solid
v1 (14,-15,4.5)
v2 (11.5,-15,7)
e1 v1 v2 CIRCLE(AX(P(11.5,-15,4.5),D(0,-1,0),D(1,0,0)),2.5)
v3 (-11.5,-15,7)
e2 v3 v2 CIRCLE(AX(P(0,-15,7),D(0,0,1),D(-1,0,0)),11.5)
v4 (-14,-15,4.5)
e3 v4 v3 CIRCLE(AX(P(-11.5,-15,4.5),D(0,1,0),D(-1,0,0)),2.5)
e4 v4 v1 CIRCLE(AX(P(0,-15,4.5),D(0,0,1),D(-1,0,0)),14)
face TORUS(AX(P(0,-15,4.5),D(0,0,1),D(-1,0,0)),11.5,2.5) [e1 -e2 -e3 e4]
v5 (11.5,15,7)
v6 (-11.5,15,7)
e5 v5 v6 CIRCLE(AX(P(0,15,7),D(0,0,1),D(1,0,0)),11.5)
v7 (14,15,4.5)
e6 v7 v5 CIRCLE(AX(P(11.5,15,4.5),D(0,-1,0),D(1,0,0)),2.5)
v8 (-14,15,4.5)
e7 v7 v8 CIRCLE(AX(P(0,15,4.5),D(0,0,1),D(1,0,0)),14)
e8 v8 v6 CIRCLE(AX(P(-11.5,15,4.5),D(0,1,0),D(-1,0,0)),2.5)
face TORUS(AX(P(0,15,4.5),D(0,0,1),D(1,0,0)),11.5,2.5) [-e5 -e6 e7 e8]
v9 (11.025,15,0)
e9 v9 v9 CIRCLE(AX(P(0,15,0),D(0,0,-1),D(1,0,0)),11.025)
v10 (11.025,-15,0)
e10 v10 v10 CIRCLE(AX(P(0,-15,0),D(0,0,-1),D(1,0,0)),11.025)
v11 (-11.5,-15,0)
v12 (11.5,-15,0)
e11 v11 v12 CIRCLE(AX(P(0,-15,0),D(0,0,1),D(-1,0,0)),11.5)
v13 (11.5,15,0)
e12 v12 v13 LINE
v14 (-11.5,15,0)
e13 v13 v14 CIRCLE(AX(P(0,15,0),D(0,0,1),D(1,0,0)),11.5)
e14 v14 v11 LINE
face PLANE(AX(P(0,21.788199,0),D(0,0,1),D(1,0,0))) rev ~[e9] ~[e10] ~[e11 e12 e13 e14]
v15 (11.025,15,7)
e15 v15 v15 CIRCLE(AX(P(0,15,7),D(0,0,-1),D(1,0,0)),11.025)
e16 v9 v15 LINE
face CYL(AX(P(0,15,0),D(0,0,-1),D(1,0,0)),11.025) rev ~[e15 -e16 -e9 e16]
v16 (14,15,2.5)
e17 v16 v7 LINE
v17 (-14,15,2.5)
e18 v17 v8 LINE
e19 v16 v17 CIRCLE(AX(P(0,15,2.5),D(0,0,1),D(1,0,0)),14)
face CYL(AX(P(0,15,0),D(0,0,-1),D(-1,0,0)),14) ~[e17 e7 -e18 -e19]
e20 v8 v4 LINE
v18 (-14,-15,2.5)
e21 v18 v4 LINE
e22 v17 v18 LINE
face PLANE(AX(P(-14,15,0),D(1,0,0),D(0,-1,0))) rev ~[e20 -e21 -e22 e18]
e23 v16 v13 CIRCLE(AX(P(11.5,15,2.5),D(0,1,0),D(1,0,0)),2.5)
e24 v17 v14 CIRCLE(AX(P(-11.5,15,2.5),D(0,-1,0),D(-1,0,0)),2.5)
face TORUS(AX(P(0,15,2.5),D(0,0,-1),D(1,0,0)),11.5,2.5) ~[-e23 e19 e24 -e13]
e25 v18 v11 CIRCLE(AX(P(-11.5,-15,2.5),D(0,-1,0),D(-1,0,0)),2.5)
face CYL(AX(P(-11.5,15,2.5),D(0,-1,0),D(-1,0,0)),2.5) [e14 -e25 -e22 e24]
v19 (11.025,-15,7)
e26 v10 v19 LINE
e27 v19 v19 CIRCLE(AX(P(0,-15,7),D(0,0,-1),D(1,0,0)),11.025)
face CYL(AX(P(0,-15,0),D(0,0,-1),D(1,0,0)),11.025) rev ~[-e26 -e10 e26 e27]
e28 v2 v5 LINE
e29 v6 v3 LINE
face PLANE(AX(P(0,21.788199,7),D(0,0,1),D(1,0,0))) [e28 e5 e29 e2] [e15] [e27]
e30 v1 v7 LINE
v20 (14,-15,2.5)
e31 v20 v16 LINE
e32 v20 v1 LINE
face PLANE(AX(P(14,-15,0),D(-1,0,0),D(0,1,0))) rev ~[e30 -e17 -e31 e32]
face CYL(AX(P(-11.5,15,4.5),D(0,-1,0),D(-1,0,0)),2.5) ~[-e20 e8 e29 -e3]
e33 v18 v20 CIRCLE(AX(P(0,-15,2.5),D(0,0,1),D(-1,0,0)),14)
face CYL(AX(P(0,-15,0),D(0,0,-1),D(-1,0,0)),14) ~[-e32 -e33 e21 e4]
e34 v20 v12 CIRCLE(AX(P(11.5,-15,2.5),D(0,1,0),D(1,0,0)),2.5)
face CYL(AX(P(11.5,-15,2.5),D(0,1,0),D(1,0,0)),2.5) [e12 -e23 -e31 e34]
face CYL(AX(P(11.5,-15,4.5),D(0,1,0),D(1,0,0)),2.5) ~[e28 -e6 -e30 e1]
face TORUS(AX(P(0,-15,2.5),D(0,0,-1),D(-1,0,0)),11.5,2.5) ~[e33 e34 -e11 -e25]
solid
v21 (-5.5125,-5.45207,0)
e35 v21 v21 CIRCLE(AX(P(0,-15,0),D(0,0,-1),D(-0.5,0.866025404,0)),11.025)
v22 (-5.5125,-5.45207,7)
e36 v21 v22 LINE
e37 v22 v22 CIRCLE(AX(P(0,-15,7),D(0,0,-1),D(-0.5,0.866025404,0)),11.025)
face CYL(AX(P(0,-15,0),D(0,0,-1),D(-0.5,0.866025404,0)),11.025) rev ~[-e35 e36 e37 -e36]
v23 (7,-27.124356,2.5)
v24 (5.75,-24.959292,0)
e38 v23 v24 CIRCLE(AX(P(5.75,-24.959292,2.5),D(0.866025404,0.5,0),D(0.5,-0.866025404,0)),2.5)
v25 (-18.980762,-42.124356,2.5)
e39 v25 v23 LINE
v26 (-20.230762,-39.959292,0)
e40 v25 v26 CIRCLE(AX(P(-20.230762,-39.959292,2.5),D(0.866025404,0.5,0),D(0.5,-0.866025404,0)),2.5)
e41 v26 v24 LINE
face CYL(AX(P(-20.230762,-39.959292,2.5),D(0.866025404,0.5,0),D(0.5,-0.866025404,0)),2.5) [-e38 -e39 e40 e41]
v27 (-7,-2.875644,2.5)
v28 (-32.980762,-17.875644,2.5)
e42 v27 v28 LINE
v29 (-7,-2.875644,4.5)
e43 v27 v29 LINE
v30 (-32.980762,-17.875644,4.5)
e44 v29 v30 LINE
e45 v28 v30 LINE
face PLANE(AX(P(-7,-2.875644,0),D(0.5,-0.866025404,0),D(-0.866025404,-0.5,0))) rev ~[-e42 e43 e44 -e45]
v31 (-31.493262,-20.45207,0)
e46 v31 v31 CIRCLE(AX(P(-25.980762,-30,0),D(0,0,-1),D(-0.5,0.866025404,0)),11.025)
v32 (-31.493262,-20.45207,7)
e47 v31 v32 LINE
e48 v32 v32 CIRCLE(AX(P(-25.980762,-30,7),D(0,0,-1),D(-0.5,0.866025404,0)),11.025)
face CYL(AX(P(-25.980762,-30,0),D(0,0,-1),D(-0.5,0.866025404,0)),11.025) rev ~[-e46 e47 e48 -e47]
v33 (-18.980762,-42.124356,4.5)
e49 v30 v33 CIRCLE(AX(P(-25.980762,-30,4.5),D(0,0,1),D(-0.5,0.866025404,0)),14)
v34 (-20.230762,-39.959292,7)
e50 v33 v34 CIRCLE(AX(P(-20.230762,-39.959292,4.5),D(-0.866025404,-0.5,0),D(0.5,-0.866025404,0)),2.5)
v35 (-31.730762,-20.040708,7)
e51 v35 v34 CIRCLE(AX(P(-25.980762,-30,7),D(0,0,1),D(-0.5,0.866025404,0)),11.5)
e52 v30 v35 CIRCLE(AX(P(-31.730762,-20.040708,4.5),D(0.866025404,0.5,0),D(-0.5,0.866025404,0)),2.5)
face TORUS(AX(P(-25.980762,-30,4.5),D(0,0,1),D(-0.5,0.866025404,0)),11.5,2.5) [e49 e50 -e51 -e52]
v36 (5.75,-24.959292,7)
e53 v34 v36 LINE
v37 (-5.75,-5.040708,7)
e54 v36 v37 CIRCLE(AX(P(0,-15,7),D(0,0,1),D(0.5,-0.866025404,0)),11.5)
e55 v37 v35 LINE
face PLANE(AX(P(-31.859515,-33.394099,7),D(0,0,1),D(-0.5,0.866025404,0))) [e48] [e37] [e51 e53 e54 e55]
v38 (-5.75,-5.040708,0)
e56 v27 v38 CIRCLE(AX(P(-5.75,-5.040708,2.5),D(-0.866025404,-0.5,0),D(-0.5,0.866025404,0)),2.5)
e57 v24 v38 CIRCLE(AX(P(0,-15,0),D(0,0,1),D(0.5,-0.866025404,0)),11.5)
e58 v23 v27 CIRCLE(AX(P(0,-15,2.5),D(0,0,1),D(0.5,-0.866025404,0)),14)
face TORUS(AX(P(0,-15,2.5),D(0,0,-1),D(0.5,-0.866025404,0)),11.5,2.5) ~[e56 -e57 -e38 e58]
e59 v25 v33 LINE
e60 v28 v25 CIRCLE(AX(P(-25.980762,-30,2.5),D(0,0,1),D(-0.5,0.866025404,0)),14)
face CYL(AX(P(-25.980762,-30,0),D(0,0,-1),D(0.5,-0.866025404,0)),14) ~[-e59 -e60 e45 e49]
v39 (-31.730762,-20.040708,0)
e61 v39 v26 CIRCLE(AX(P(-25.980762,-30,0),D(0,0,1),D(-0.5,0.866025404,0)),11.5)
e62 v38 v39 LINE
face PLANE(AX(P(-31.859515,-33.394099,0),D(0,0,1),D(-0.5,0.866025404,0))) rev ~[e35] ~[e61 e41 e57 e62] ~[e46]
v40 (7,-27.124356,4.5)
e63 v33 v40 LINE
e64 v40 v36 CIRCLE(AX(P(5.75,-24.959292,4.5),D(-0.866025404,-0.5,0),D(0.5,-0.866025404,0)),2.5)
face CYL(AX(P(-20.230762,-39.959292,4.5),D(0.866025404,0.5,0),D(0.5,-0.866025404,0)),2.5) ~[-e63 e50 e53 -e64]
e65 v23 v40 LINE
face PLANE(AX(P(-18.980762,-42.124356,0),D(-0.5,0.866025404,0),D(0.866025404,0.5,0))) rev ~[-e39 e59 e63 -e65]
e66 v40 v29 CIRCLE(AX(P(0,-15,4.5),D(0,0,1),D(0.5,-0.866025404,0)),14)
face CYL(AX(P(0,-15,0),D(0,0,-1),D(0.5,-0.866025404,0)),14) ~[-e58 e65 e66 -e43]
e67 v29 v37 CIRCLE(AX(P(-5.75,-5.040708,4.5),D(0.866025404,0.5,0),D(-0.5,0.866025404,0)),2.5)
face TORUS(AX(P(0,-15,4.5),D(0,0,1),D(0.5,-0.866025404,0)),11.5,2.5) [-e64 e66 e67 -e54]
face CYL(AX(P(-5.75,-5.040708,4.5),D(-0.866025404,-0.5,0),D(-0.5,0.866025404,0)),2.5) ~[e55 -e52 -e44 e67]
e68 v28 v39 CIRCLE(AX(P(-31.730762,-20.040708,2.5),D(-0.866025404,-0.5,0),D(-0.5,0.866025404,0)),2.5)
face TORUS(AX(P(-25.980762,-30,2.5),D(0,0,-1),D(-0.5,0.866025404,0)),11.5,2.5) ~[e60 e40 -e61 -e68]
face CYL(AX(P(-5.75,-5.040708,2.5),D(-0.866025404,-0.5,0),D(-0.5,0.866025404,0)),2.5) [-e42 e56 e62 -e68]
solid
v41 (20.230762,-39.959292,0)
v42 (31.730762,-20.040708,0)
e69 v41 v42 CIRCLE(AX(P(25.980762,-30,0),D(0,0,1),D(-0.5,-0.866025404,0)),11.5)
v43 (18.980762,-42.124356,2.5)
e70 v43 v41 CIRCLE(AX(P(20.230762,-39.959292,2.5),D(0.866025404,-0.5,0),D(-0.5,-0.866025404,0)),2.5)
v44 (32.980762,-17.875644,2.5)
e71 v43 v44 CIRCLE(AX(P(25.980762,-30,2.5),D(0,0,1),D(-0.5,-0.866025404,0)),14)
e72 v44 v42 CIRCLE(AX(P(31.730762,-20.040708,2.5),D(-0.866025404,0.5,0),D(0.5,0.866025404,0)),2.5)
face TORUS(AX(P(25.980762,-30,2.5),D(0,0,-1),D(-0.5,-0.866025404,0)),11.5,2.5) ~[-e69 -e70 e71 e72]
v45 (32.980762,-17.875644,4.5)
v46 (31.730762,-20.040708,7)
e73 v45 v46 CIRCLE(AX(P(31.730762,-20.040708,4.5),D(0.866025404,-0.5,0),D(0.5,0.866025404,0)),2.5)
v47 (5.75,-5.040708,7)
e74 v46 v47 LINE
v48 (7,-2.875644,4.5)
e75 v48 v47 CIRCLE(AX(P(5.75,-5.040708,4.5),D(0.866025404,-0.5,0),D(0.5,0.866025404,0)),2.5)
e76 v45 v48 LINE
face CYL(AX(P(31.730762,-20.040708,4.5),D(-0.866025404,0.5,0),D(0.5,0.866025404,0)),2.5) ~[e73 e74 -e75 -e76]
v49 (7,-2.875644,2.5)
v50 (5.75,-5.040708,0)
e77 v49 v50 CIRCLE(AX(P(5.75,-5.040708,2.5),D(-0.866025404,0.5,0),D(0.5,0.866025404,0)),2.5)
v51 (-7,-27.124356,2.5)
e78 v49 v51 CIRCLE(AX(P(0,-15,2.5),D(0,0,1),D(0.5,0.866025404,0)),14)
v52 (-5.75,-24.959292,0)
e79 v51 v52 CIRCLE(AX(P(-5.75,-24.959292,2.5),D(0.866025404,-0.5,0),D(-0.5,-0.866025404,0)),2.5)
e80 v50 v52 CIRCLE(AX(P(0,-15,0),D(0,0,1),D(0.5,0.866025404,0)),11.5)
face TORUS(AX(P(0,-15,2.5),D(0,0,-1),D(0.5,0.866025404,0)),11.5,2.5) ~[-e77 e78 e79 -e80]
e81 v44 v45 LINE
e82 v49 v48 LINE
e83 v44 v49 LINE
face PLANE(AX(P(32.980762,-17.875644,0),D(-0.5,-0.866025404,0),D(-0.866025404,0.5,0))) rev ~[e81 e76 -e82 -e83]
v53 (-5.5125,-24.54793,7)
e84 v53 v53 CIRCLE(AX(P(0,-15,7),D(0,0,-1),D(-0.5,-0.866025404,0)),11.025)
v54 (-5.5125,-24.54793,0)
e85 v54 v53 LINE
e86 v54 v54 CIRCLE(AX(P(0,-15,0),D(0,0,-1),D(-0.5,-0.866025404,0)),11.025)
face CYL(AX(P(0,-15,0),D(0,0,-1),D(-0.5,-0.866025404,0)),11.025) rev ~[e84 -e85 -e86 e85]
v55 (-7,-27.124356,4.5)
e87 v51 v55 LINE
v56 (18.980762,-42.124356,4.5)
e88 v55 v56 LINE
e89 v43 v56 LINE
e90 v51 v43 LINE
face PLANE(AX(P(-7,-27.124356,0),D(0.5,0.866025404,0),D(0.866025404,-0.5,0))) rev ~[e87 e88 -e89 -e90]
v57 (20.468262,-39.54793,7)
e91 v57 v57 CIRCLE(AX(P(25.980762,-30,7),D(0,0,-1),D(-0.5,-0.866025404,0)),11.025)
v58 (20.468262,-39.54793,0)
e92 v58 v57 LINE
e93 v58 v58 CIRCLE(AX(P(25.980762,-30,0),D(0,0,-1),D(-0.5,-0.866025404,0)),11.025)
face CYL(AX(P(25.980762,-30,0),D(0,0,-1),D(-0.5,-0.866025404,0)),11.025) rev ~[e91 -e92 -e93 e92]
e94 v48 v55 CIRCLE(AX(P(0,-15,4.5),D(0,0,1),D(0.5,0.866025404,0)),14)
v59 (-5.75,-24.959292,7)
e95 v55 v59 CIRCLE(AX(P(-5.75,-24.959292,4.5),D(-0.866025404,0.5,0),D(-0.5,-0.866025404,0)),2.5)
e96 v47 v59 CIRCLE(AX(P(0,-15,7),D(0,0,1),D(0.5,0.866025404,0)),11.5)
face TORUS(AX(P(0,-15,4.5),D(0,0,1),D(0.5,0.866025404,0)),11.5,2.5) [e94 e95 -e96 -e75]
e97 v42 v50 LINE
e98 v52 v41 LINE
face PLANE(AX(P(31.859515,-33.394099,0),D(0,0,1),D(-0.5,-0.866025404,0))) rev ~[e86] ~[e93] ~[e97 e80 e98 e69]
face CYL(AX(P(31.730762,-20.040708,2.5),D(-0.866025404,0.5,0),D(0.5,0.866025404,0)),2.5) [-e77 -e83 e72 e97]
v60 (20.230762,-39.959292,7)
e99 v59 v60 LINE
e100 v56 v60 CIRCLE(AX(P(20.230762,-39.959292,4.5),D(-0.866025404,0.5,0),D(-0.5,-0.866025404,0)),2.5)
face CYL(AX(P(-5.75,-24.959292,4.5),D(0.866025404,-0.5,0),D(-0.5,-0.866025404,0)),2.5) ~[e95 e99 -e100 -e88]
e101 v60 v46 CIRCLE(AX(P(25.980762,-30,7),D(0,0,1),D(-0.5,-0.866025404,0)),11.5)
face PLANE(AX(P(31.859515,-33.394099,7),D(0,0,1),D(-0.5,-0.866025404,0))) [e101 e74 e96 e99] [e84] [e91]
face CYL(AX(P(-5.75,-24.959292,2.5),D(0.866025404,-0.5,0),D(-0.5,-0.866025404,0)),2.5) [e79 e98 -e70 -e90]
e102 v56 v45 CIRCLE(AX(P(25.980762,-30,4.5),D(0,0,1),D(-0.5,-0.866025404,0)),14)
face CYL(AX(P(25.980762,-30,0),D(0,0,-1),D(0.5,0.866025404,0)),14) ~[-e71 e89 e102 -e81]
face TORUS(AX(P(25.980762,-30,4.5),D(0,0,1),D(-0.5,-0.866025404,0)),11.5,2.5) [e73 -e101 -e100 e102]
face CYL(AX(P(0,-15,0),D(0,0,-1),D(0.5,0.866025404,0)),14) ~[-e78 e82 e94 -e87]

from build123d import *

# Parameters (mm, degrees)
F1_DEPTH        = 7
F1_COPIES_COUNT = 3
F3_R            = 2.5
F3_2_R          = 2.5
F3_3_R          = 2.5


# Not quite as in the source:
# - a feature of the source that left no trace in its solid (it failed there, or was rolled back) is left out
# - a pattern or mirror of a feature is missing from the dataset's text; its kind, count and spacing are read off the source's solid


with BuildPart() as f1:
    # F0 (on Top) → F1 (new body)
    with BuildSketch(Plane.XY):
        with BuildLine():
            Line((11.025, 15), (14, 15))
            ThreePointArc((14, 15), (0, 29), (-14, 15))
            Line((-14, 15), (-11.025, 15))
            ThreePointArc((-11.025, 15), (0, 26.025), (11.025, 15))
        make_face()
        with BuildLine():
            ThreePointArc((-14, 15), (0, 1), (14, 15))
            Line((14, 15), (11.025, 15))
            ThreePointArc((11.025, 15), (0, 3.975), (-11.025, 15))
            Line((-11.025, 15), (-14, 15))
        make_face()
        with BuildLine():
            ThreePointArc((-14, -15), (0, -1), (14, -15))
            Line((14, -15), (14, 15))
            ThreePointArc((14, 15), (0, 1), (-14, 15))
            Line((-14, 15), (-14, -15))
        make_face()
        with BuildLine():
            Line((11.025, -15), (14, -15))
            ThreePointArc((14, -15), (0, -1), (-14, -15))
            Line((-14, -15), (-11.025, -15))
            ThreePointArc((-11.025, -15), (0, -3.975), (11.025, -15))
        make_face()
        with BuildLine():
            ThreePointArc((-14, -15), (0, -29), (14, -15))
            Line((14, -15), (11.025, -15))
            ThreePointArc((11.025, -15), (0, -26.025), (-11.025, -15))
            Line((-11.025, -15), (-14, -15))
        make_face()
    extrude(amount=F1_DEPTH)


with BuildPart() as f1_copies_1:
    # F1_copies: instance of F1
    add(f1.part.rotate(Axis((0, -15, 0), (0, 0, 1)), 1 * 360 / F1_COPIES_COUNT))

    # F3#2
    f3_2_edges = [f1_copies_1.edges().sort_by_distance(p)[0] for p in [
        (-38.105118, -37, 0),
        (-38.105118, -37, 7),
        (-5.990381, -34.624356, 0),
        (-5.990381, -34.624356, 7),
        (-19.990381, -10.375644, 0),
        (-19.990381, -10.375644, 7),
    ]]
    fillet(f3_2_edges, radius=F3_2_R)


with BuildPart() as f1_copies_2:
    # F1_copies: instance of F1
    add(f1.part.rotate(Axis((0, -15, 0), (0, 0, 1)), 2 * 360 / F1_COPIES_COUNT))

    # F3#3
    f3_3_edges = [f1_copies_2.edges().sort_by_distance(p)[0] for p in [
        (38.105118, -37, 0),
        (38.105118, -37, 7),
        (19.990381, -10.375644, 0),
        (19.990381, -10.375644, 7),
        (5.990381, -34.624356, 0),
        (5.990381, -34.624356, 7),
    ]]
    fillet(f3_3_edges, radius=F3_3_R)


with BuildPart() as f1_1:
    add(f1.part)

    # F3
    f3_edges = [f1_1.edges().sort_by_distance(p)[0] for p in [
        (-14, 0, 7),
        (0, 29, 7),
        (14, 0, 7),
        (-14, 0, 0),
        (0, 29, 0),
        (14, 0, 0),
    ]]
    fillet(f3_edges, radius=F3_R)


solid = Compound([f1_copies_1.part, f1_copies_2.part, f1_1.part])
